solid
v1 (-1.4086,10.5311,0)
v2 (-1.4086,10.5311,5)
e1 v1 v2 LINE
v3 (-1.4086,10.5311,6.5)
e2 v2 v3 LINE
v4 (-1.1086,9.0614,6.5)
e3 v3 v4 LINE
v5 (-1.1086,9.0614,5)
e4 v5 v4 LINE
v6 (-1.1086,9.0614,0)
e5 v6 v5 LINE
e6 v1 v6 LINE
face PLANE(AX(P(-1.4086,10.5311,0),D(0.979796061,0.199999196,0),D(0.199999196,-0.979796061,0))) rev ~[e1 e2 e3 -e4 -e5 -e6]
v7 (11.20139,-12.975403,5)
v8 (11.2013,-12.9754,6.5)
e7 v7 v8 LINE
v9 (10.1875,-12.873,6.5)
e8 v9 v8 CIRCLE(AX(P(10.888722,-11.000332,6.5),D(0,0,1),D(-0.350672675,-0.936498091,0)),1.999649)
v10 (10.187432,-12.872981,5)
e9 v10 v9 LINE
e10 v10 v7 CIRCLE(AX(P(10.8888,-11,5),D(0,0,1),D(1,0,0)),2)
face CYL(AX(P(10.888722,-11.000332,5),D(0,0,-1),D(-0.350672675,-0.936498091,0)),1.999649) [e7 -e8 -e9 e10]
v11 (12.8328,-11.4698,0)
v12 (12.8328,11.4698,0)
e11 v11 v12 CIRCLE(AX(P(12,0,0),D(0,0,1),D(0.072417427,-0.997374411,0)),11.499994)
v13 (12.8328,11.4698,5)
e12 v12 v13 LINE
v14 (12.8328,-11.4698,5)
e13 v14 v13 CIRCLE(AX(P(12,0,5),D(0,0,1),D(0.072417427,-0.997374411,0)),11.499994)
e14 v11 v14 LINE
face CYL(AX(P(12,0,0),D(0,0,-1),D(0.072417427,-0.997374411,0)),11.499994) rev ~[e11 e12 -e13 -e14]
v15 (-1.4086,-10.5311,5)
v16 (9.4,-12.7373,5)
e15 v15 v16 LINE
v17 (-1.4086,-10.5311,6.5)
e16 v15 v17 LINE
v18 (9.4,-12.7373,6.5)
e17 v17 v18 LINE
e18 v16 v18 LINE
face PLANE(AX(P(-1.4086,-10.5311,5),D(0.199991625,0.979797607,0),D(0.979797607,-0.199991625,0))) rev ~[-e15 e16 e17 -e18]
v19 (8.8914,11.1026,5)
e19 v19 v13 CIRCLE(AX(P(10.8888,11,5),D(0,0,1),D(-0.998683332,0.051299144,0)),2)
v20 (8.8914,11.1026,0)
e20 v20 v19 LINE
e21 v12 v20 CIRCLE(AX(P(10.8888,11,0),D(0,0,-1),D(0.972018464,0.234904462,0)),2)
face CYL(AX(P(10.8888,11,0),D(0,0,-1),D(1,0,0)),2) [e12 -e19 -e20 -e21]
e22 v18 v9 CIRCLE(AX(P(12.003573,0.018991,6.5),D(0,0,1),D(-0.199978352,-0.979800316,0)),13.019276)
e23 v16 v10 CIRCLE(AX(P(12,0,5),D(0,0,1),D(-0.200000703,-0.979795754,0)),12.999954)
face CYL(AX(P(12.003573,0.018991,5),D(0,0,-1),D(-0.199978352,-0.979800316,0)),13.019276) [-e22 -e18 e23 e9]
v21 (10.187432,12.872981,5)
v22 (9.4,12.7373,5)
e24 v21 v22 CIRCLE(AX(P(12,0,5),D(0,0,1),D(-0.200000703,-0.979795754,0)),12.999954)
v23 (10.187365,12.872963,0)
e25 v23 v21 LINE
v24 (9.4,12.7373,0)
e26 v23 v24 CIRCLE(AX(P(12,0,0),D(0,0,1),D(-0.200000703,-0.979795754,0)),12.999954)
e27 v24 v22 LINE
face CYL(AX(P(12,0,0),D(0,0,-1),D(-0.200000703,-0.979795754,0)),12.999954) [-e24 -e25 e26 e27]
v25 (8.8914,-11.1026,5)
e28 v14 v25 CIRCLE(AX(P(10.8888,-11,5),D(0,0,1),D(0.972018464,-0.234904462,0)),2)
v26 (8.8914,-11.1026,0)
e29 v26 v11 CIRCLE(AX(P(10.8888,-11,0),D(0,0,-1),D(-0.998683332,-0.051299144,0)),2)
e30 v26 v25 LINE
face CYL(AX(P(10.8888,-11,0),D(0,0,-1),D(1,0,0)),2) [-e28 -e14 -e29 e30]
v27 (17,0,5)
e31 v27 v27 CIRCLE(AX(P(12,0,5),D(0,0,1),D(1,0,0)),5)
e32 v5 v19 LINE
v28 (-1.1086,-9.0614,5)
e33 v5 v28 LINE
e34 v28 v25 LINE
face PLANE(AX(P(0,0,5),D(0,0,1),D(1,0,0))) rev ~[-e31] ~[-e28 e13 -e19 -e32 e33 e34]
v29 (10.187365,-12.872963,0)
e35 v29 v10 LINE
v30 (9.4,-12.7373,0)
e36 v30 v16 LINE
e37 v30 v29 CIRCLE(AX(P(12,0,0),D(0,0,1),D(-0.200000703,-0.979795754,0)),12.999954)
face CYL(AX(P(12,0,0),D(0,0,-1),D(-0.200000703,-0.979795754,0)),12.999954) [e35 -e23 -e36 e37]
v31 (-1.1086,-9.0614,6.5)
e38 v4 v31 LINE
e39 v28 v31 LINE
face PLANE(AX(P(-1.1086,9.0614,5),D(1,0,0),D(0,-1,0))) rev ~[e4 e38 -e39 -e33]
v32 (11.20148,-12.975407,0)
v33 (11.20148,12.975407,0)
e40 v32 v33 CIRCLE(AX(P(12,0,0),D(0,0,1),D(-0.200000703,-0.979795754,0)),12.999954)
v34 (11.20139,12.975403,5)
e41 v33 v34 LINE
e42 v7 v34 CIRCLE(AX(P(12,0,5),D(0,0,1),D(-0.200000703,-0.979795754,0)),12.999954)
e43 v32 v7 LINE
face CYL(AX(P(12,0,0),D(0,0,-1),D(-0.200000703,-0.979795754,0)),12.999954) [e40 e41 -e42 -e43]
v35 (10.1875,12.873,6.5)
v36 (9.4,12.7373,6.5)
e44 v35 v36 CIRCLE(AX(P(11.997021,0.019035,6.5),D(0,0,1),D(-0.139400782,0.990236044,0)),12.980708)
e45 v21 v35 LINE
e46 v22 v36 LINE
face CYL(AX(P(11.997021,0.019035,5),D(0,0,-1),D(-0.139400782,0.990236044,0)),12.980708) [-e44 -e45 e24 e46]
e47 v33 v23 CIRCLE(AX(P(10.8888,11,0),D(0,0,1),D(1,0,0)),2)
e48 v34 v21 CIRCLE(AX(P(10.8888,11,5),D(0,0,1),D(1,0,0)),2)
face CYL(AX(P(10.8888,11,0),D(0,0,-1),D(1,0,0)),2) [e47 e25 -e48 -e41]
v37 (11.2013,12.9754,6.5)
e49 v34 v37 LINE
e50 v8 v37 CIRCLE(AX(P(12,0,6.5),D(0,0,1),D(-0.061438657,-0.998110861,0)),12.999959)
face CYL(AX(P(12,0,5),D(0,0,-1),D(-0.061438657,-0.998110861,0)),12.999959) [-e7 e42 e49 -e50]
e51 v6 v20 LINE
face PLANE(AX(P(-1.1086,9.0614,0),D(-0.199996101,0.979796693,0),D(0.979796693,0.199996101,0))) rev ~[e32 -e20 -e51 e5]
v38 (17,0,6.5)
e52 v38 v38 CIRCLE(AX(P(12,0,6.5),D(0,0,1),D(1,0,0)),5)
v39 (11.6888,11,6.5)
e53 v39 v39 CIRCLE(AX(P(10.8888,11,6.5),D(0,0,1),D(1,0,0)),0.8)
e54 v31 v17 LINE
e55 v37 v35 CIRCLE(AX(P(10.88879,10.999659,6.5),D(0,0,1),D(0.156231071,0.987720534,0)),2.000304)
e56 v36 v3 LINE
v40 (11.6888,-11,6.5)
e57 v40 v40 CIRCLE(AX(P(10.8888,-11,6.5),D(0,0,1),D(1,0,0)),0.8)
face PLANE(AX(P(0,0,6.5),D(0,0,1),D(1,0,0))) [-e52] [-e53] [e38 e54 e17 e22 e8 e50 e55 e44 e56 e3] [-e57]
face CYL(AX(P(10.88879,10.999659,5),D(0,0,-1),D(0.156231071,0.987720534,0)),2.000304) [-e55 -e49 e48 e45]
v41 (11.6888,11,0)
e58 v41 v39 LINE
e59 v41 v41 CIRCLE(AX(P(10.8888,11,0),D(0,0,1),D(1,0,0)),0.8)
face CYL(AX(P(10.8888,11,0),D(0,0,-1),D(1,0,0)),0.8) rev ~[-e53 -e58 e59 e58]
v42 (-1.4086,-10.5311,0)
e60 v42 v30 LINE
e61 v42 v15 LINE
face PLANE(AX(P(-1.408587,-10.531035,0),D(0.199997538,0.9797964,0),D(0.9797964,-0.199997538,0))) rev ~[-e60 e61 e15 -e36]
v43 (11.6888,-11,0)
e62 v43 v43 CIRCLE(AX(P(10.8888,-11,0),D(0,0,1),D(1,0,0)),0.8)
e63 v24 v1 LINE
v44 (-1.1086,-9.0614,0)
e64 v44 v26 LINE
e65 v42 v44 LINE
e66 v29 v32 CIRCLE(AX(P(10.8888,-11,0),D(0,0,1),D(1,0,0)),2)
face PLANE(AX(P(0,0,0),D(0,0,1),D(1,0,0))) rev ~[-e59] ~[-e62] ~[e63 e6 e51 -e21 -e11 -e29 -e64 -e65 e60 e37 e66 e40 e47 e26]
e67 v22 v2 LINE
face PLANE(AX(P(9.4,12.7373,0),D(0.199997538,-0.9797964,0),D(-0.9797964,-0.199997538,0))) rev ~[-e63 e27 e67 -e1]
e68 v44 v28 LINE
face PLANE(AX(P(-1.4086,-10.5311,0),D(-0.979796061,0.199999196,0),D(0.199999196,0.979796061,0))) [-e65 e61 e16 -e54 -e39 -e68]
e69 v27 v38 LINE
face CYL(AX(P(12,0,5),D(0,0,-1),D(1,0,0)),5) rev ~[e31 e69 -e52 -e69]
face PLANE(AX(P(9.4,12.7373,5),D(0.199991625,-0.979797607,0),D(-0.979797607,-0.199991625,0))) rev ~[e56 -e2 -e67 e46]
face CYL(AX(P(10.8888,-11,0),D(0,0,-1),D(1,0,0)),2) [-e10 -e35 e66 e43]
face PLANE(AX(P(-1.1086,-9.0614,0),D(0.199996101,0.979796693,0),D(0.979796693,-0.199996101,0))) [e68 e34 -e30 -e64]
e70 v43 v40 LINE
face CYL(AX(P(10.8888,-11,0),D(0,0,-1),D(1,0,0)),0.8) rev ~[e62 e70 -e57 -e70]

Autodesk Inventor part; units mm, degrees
ref_plane "YZ Plane" through (0, 0, 0) normal (1, 0, 0) x (0, 1, 0)
ref_plane "XZ Plane" through (0, 0, 0) normal (0, 1, 0) x (-1, 0, 0)
ref_plane "XY Plane" through (0, 0, 0) normal (0, 0, 1) x (1, 0, 0)
ref_plane "作業平面1" through (0, 0, 0) normal (0, 0, 1) x (1, 0, 0)
sketch "スケッチ1" plane through (0, 0, 0) normal (0, 0, 1) x (1, 0, 0)
  arc A0 (9.4, -12.7373) -> (9.4, 12.7373) centre (12, 0) ccw projected
  circle A1 centre (10.8888, 11) radius 0.8 projected
  circle A2 centre (10.8888, -11) radius 0.8 projected
  circle A3 centre (10.8888, 11) radius 2
  circle A4 centre (10.8888, -11) radius 2
  arc A5 (12.8328, -11.4698) -> (12.8328, 11.4698) centre (12, 0) ccw
  line L0 (9.4, 12.7373) -> (-19.4, 6.8586) projected
  line L1 (-19.4, -6.8586) -> (9.4, -12.7373) projected
  line L2 (-1.4086, 10.5311) -> (-1.1086, 9.0614)
  line L3 (-1.1086, 9.0614) -> (8.8914, 11.1026)
  line L4 (-1.4086, -10.5311) -> (-1.1086, -9.0614)
  line L5 (-1.1086, -9.0614) -> (8.8914, -11.1026)
  point P0 (0, 0)
  point P1 (10.1875, -12.873)
  point P2 (11.2013, -12.9754)
  point P3 (11.2013, 12.9754)
  point P4 (10.1875, 12.873)
  dimension "d0" = 4
  dimension "d1" = 1.5
  dimension "d2" = 1.5
  dimension "d3" = 10
extrude "押し出し1" add sketch "スケッチ1" along normal blind 5
sketch "スケッチ2" plane through (0, 0, 5) normal (0, 0, 1) x (1, 0, 0)
  arc A0 (8.8914, 11.1026) -> (12.8328, 11.4698) centre (10.8888, 11) ccw projected
  arc A1 (12.8328, -11.4698) -> (12.8328, 11.4698) centre (12, 0) ccw projected
  arc A2 (12.8328, -11.4698) -> (8.8914, -11.1026) centre (10.8888, -11) ccw projected
  line L0 (8.8914, -11.1026) -> (-1.1086, -9.0614) projected
  line L1 (-1.1086, -9.0614) -> (-1.4086, -10.5311) projected
  line L2 (-1.4086, -10.5311) -> (9.4, -12.7373) projected
  arc A3 (9.4, -12.7373) -> (10.1875, -12.873) centre (12, 0) ccw projected
  arc A4 (10.1875, -12.873) -> (11.2013, -12.9754) centre (10.8888, -11) ccw projected
  arc A5 (11.2013, -12.9754) -> (11.2013, 12.9754) centre (12, 0) ccw projected
  arc A6 (11.2013, 12.9754) -> (10.1875, 12.873) centre (10.8888, 11) ccw projected
  arc A7 (10.1875, 12.873) -> (9.4, 12.7373) centre (12, 0) ccw projected
  line L3 (9.4, 12.7373) -> (-1.4086, 10.5311) projected
  line L4 (-1.4086, 10.5311) -> (-1.1086, 9.0614) projected
  line L5 (-1.1086, 9.0614) -> (8.8914, 11.1026) projected
  circle A8 centre (10.8888, -11) radius 0.8 projected
  circle A9 centre (10.8888, 11) radius 0.8 projected
  line L6 (-1.1086, 9.0614) -> (-1.1086, -9.0614)
  circle A10 centre (12, 0) radius 5
  point P0 (0, 0)
  dimension "d6" = 10
extrude "押し出し2" add sketch "スケッチ2" along normal blind 1.5
properties part number "MotorCover"
